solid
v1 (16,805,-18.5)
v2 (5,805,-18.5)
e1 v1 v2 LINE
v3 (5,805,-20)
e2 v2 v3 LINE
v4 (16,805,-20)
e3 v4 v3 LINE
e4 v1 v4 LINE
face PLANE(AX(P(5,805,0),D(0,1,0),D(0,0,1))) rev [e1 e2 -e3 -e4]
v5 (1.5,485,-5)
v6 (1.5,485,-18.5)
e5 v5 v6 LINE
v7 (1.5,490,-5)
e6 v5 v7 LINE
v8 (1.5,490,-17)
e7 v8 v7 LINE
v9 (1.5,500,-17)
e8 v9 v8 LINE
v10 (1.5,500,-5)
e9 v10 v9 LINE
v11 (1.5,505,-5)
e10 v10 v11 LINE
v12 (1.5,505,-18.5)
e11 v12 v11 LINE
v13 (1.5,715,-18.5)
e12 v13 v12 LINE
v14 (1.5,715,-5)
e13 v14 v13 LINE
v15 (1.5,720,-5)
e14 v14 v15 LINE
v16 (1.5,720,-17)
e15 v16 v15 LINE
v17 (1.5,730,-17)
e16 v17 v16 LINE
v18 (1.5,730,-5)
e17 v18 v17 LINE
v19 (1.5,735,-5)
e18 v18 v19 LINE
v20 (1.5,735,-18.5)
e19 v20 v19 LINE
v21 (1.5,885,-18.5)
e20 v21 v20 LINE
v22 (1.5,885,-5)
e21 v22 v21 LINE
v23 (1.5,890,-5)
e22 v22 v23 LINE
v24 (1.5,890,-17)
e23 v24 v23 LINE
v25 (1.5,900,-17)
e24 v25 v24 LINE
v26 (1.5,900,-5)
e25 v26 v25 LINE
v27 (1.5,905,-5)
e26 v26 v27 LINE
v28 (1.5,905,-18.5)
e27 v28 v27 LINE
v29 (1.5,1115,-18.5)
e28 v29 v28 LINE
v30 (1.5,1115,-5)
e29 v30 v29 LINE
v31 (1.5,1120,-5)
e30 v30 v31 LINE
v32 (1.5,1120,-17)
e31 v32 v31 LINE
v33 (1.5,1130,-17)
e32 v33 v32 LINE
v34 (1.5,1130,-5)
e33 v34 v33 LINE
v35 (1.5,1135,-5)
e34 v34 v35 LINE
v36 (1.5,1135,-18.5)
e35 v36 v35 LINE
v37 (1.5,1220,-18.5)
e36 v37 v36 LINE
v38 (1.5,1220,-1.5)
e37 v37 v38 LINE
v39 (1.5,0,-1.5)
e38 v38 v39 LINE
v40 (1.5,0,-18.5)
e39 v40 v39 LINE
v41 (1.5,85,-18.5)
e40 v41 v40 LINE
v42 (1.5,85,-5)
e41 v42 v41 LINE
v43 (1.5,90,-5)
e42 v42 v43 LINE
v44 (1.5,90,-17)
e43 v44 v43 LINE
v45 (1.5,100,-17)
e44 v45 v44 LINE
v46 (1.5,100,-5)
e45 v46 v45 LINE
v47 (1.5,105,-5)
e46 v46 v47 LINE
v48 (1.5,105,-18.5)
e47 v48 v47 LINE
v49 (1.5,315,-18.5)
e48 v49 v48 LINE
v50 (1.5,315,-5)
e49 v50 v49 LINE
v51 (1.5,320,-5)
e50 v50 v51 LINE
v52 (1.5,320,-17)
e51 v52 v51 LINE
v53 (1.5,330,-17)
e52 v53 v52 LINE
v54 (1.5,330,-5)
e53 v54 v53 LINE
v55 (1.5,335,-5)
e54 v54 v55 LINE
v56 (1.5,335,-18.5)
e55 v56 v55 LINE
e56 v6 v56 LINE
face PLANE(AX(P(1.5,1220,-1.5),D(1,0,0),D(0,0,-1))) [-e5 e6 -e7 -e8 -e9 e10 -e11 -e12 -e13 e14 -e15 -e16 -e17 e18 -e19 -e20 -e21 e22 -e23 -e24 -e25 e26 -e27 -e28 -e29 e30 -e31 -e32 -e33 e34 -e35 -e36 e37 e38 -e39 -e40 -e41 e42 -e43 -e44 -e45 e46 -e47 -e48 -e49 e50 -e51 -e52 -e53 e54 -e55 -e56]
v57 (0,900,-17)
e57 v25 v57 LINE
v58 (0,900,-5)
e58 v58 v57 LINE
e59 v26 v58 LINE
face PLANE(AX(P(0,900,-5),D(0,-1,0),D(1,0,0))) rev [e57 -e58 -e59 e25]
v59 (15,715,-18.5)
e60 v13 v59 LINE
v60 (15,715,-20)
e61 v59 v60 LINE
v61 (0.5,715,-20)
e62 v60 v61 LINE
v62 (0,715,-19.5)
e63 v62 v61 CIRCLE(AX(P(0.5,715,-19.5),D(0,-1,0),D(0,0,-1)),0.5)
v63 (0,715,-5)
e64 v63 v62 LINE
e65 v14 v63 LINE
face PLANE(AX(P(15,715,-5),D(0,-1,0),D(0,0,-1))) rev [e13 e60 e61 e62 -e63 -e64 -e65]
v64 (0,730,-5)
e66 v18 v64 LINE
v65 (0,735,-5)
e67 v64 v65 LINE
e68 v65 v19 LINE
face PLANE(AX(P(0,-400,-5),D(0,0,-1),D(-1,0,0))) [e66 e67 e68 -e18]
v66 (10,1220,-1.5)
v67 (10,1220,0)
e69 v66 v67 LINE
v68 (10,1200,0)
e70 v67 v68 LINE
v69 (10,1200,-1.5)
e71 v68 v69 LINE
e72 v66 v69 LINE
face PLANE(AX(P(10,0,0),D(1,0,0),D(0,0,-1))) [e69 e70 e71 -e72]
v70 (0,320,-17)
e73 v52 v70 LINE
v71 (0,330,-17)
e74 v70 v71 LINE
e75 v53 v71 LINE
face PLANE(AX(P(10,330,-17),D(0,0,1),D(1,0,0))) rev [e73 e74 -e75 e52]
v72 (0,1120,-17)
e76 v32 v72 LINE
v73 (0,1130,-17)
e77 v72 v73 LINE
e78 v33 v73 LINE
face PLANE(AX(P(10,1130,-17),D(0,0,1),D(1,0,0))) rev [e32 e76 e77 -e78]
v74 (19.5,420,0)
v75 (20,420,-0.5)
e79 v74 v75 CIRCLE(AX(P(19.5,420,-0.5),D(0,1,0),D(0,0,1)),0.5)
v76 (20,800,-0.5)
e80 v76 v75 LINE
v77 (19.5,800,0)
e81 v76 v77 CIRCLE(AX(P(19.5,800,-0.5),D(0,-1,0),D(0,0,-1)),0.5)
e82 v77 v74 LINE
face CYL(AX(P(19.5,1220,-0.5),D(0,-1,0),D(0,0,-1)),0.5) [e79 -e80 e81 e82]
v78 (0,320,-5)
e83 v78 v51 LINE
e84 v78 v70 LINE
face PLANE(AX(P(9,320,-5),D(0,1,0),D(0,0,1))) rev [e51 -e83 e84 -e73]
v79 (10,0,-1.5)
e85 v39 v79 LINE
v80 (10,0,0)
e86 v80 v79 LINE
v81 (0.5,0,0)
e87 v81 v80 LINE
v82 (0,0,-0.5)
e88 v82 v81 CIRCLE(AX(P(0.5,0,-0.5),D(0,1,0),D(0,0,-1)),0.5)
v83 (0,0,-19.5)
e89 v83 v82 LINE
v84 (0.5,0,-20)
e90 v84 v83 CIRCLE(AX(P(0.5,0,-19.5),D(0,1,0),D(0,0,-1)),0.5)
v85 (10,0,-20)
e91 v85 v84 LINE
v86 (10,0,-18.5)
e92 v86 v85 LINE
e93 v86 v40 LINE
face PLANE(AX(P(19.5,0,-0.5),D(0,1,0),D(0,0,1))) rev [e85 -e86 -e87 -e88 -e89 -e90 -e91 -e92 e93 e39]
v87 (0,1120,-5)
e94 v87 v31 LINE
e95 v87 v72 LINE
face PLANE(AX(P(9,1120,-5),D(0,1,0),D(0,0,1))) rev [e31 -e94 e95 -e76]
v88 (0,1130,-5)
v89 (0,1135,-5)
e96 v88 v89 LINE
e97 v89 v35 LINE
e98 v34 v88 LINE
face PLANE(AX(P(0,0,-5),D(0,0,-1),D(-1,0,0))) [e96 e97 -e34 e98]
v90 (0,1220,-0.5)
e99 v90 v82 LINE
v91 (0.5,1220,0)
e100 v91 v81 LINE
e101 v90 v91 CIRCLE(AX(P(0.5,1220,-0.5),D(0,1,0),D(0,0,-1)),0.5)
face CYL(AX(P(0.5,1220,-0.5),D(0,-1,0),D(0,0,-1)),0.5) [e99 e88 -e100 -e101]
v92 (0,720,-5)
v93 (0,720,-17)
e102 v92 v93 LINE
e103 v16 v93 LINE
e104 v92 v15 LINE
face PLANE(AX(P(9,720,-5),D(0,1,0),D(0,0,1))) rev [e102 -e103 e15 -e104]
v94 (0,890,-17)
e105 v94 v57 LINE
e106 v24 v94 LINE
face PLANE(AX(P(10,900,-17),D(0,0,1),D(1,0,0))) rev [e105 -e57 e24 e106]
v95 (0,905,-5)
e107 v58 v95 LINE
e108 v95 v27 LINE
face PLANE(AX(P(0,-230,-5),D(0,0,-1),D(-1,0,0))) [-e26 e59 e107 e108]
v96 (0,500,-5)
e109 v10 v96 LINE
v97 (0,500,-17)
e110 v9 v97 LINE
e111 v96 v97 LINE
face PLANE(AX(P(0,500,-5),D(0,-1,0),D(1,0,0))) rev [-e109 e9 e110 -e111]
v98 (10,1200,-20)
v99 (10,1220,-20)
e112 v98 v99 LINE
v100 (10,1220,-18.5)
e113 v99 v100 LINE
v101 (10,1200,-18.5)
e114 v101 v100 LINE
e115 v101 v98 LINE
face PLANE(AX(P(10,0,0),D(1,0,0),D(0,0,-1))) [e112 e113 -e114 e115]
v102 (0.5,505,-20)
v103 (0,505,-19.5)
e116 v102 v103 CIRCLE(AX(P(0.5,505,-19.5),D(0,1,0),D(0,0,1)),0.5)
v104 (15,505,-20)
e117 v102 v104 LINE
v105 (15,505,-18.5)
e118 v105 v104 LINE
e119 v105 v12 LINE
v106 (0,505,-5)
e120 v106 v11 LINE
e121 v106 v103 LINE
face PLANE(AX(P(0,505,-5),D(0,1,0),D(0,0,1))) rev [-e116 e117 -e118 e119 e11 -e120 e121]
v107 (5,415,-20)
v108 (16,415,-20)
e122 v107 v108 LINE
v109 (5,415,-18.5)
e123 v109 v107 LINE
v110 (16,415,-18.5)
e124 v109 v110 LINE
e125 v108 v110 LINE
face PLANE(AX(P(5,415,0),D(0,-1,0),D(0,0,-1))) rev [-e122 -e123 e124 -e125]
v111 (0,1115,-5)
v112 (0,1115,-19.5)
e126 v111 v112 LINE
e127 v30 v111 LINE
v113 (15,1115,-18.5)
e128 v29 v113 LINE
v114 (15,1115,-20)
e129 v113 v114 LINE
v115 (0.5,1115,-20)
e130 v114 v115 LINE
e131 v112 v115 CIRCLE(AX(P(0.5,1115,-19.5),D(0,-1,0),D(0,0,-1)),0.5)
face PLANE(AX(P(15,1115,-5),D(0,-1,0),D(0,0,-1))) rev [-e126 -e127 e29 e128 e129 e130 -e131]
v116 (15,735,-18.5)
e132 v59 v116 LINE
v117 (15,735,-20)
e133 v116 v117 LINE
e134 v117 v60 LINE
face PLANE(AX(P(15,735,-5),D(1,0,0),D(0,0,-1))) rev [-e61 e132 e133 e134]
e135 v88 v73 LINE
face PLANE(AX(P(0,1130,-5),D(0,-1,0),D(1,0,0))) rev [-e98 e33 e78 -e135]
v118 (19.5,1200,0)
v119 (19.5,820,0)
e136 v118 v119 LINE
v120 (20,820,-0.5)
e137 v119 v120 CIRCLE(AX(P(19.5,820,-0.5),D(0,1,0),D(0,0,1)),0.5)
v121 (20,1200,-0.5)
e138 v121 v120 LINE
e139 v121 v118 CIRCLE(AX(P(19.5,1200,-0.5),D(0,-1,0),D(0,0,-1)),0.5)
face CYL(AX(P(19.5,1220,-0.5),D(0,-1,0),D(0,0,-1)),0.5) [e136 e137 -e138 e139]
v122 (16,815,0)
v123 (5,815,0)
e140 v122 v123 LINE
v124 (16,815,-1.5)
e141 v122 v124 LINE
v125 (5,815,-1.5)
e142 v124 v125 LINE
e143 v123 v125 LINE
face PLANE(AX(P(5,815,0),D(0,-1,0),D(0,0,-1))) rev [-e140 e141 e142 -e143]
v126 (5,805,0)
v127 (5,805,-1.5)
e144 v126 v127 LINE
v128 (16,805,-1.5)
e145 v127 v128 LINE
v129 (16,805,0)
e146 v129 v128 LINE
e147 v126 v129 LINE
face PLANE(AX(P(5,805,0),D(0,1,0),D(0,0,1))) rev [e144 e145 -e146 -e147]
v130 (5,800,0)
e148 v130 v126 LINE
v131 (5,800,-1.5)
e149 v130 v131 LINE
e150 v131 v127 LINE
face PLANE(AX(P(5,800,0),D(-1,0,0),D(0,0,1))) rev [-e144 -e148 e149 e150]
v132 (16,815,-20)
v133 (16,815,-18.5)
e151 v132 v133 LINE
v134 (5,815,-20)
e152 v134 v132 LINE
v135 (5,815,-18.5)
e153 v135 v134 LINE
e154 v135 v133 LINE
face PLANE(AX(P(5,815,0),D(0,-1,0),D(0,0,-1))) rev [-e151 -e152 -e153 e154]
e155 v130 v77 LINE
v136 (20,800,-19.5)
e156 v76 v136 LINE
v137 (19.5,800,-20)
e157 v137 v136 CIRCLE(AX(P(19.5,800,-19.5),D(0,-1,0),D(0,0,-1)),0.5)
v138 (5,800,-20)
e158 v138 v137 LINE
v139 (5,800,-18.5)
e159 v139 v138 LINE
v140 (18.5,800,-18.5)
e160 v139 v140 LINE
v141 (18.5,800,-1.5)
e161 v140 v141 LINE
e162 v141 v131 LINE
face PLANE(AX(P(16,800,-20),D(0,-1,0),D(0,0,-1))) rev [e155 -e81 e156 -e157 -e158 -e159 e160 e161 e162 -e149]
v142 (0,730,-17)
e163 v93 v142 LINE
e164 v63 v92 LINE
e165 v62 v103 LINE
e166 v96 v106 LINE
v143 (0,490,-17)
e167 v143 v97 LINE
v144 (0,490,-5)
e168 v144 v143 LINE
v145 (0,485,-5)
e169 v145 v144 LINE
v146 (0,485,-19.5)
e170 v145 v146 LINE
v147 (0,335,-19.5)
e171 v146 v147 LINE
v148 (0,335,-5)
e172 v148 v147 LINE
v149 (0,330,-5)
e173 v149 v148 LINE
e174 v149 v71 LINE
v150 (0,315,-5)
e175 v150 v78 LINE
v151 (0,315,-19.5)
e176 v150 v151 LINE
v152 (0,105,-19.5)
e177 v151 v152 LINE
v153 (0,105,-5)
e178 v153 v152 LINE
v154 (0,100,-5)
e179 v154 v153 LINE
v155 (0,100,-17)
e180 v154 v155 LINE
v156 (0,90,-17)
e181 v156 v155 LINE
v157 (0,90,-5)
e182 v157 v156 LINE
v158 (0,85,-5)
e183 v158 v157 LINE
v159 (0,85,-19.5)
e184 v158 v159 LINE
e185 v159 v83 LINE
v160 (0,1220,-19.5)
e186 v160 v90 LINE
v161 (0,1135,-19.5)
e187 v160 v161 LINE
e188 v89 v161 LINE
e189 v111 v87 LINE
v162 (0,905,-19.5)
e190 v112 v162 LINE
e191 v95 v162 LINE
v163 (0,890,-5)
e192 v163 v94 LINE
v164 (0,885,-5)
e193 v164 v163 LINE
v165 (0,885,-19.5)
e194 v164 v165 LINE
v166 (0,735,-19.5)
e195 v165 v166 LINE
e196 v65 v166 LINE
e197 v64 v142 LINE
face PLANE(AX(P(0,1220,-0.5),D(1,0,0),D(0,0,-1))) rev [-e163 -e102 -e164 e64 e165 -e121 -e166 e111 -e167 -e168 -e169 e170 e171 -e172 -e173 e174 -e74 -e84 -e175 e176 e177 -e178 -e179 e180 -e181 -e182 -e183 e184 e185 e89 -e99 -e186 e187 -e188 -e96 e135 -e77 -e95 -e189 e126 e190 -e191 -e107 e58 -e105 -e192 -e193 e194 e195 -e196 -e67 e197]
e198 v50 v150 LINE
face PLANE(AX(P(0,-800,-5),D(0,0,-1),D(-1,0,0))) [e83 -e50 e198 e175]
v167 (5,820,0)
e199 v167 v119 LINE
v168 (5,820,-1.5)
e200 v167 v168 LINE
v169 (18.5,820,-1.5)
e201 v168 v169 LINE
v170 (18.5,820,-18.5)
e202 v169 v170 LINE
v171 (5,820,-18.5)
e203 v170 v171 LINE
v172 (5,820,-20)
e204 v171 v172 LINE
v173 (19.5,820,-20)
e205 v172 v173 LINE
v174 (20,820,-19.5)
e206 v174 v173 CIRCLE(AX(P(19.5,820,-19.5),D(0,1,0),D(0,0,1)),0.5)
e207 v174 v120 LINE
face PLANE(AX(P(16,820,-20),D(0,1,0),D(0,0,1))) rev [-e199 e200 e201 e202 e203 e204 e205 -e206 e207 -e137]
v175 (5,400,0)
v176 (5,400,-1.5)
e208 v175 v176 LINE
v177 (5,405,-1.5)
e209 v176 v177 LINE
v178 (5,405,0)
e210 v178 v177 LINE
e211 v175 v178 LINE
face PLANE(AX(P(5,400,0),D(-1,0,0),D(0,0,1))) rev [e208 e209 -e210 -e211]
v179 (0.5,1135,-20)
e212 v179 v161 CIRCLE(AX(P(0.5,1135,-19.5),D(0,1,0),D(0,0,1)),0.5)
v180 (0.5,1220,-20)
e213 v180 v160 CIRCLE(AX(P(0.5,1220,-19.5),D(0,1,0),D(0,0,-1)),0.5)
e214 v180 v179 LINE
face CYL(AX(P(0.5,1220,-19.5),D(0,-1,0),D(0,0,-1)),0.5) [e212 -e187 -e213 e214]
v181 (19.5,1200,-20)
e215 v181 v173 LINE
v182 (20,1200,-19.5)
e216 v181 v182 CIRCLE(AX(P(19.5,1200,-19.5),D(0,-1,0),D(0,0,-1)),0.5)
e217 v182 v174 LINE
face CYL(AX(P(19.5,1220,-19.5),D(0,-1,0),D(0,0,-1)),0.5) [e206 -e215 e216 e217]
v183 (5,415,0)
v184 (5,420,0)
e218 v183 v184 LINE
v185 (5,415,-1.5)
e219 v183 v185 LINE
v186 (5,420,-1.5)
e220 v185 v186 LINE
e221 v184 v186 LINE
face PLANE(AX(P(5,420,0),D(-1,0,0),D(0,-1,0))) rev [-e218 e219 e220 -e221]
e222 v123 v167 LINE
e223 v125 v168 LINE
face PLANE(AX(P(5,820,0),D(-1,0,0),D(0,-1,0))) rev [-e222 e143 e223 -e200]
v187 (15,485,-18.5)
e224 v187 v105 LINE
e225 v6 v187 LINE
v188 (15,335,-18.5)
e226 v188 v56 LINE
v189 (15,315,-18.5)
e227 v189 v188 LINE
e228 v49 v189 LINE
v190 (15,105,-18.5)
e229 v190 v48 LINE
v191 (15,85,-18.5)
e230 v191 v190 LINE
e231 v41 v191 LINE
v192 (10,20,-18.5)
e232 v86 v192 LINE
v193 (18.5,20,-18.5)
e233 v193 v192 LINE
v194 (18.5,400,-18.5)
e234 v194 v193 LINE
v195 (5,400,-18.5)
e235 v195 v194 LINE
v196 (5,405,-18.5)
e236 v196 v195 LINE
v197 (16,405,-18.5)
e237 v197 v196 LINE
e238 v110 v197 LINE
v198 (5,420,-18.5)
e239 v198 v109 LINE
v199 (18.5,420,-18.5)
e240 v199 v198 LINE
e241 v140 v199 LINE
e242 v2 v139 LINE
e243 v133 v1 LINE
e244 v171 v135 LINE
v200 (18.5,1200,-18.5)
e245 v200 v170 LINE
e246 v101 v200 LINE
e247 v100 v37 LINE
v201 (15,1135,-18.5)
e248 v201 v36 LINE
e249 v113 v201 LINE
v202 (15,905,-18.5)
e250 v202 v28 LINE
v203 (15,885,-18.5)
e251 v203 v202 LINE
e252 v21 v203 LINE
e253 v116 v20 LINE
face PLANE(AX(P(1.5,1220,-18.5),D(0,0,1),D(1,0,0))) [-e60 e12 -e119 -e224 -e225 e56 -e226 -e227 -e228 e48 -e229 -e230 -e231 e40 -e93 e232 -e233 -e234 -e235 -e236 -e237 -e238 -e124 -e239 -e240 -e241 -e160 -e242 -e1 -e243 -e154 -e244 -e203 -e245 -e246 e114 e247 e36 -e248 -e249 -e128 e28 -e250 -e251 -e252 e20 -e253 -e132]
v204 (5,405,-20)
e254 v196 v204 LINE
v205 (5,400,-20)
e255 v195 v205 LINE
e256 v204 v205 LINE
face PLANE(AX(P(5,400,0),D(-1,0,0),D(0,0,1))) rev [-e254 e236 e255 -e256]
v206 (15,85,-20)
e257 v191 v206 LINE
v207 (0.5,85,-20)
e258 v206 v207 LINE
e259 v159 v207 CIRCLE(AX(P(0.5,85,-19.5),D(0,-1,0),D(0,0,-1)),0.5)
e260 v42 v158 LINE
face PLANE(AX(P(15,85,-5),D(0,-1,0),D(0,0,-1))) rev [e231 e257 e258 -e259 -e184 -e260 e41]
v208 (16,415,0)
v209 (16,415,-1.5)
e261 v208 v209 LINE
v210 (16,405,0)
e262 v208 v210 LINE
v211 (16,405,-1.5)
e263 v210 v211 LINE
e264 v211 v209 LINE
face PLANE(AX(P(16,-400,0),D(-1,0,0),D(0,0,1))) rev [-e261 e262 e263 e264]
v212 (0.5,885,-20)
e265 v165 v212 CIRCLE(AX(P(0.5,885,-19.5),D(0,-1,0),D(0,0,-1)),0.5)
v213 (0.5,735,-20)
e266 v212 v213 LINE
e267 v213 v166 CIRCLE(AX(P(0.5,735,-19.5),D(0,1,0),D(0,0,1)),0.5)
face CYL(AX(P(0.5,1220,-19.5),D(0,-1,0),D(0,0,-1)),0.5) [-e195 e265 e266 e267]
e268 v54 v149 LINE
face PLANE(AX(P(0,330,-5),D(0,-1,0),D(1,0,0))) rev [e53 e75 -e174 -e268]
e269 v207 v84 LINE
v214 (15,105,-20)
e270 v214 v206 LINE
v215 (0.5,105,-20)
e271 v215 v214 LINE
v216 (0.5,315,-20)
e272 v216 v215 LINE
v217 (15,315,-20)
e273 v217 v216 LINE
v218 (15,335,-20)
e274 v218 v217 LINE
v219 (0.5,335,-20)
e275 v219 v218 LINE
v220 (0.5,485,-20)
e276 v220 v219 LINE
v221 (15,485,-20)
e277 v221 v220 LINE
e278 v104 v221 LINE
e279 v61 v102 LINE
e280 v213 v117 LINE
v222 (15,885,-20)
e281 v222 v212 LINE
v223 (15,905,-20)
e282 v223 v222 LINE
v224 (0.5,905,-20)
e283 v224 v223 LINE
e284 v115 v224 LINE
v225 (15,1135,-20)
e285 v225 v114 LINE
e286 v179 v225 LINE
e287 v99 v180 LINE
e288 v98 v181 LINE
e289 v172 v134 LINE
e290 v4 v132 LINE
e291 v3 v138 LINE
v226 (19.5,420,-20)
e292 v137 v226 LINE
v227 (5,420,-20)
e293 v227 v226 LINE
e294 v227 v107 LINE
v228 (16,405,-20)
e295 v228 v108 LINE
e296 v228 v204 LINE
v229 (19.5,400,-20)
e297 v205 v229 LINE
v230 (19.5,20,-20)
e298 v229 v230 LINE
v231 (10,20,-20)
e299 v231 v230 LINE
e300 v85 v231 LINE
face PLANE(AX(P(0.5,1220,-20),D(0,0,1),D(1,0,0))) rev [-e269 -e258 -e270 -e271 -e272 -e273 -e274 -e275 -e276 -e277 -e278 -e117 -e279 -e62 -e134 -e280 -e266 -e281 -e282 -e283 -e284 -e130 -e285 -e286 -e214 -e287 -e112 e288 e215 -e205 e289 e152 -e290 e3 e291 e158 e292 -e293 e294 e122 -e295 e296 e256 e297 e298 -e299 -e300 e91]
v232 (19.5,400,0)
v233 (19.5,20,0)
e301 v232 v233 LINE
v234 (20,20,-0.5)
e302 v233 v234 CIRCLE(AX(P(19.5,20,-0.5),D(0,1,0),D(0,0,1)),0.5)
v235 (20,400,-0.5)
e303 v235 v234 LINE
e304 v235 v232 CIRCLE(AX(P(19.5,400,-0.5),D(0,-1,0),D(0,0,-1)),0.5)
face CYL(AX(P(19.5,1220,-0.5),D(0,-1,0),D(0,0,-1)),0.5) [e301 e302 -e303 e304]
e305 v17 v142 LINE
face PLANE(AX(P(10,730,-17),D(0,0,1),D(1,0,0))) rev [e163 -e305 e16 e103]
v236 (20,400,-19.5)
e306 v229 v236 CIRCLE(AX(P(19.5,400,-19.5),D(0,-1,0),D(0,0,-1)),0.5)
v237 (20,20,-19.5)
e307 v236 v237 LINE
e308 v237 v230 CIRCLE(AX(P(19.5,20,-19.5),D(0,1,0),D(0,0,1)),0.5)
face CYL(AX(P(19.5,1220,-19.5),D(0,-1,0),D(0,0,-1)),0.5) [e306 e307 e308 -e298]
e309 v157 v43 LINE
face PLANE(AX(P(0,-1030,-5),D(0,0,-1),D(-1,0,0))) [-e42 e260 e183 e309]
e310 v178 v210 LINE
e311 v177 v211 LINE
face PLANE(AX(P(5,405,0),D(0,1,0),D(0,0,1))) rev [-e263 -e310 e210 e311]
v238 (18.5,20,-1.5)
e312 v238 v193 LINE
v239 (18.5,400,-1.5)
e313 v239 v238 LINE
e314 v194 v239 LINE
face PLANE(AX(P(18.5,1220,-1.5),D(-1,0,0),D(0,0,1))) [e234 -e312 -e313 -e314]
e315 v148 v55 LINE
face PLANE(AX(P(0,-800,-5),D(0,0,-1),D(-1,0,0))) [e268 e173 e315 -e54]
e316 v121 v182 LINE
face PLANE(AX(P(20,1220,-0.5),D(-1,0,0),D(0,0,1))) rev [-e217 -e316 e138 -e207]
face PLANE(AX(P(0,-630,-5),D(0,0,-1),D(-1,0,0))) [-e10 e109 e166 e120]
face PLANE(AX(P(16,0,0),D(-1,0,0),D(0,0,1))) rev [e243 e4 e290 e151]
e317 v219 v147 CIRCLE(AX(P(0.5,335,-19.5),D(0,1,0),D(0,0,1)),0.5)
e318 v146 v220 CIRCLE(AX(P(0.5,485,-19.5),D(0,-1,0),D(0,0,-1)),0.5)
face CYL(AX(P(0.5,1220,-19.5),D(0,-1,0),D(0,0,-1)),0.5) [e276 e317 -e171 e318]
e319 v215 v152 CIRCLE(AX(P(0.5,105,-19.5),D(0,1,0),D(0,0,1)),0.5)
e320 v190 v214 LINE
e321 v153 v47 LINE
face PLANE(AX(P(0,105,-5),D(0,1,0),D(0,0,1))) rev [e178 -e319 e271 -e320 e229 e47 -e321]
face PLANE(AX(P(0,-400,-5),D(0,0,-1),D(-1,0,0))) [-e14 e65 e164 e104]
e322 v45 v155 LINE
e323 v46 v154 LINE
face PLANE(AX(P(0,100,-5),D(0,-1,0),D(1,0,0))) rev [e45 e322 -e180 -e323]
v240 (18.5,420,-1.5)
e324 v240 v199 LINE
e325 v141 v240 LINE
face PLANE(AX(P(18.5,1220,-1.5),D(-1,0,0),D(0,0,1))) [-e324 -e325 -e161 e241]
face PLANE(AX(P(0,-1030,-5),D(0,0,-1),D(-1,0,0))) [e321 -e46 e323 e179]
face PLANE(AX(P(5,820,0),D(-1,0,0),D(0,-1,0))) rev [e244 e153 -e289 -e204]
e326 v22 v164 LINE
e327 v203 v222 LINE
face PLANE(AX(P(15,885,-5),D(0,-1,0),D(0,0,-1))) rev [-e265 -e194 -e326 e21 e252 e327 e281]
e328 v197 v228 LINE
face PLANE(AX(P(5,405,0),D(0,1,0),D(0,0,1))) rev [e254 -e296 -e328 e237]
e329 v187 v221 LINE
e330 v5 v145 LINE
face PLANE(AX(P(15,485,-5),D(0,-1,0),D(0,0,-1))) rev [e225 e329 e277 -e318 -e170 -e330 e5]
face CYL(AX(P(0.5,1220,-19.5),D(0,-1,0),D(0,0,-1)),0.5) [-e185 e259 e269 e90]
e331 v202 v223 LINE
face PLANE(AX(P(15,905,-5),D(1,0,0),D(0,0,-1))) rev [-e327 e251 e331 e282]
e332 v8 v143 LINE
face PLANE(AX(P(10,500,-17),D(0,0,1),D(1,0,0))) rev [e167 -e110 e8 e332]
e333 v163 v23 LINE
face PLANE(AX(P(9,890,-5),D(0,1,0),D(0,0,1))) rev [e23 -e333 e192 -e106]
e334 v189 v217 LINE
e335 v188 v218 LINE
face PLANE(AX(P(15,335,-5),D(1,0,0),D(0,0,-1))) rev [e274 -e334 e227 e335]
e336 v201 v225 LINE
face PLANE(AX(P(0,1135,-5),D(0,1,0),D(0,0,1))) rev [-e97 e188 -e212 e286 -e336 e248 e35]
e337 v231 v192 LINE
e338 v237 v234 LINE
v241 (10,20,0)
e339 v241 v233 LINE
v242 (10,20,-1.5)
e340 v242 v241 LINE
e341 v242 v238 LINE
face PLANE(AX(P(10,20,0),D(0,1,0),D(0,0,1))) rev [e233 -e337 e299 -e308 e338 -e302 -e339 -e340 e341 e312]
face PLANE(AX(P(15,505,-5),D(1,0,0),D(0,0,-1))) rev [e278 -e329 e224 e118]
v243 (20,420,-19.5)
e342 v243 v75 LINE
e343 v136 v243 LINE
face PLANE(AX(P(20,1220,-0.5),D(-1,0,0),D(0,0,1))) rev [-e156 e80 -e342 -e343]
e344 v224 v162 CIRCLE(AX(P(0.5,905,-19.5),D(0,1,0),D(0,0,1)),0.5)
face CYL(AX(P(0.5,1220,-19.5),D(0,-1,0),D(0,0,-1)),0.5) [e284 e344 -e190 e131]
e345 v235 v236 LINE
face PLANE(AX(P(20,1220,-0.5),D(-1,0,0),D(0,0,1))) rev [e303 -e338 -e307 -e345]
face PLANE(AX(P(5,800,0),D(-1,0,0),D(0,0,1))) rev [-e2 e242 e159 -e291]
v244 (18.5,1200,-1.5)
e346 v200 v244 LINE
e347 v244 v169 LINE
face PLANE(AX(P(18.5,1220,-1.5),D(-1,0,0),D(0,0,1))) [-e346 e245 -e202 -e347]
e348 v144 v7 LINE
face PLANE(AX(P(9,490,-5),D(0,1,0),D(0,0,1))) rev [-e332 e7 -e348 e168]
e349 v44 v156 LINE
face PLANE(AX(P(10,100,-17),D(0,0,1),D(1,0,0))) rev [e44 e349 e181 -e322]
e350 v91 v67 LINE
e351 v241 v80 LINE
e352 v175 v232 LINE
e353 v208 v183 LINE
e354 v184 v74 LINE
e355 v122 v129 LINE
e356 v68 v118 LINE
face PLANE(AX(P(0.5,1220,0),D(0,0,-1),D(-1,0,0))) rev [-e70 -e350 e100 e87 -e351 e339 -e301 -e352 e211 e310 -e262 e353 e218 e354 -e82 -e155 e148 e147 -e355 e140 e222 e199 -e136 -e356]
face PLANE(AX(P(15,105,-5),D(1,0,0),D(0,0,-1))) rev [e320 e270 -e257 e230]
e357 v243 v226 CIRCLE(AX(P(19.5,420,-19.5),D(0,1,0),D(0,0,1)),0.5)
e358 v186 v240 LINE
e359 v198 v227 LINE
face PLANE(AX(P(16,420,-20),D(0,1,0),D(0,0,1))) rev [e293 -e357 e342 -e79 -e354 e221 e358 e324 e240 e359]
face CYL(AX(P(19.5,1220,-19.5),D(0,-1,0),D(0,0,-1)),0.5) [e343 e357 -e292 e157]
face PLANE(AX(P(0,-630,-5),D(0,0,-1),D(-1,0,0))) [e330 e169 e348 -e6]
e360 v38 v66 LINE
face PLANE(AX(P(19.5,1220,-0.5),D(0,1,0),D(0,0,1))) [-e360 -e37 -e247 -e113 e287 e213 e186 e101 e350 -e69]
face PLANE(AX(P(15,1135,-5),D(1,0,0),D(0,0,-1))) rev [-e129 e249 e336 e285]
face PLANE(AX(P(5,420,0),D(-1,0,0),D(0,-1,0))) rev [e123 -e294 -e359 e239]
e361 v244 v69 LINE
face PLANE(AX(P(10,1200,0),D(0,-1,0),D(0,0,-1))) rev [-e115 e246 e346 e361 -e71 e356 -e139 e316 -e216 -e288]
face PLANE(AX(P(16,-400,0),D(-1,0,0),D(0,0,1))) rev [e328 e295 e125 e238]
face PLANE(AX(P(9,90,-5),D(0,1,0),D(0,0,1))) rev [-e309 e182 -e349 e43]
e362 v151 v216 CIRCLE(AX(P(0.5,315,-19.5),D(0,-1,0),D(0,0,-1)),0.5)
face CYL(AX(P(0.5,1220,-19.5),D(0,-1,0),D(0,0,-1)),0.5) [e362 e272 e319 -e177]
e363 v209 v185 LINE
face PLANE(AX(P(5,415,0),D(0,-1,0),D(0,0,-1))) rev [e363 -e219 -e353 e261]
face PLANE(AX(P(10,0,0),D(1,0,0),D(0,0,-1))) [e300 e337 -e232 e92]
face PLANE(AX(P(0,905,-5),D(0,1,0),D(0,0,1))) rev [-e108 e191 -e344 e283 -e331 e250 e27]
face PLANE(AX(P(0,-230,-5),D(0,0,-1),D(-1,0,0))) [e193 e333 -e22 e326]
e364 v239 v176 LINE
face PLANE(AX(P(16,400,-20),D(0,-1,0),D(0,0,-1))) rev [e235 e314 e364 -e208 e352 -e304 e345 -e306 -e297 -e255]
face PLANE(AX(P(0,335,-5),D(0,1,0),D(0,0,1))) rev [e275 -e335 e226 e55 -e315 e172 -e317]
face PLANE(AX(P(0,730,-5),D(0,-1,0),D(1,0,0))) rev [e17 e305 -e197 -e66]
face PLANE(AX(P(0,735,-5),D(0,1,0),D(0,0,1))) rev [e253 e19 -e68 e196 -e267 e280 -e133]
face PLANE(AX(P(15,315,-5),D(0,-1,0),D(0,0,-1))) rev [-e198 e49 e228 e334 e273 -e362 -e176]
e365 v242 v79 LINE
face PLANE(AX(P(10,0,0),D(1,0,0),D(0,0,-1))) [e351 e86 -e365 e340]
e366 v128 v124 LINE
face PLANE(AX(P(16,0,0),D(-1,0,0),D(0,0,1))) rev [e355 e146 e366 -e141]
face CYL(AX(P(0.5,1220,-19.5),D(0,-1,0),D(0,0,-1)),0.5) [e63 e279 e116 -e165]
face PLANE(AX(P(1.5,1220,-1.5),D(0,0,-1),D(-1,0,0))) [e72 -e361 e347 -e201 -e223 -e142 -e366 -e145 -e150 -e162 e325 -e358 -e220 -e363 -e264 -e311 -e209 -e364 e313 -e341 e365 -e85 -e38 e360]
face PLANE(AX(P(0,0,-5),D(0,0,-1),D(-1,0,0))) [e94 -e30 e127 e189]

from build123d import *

# Parameters (mm, degrees)
SKETCH1_W                   = 17
SKETCH1_H                   = 17
BOSS_EXTRUDE1_DEPTH         = 1220
SKETCH2_W                   = 20
SKETCH2_H                   = 20
CUT_EXTRUDE1_DEPTH          = 10
CUT_EXTRUDE2_DEPTH          = 15
SKETCH4_W                   = 3
SKETCH4_H                   = 10
CUT_EXTRUDE3_DEPTH          = 10
SKETCH_PATTERN1_START       = -20
SKETCH_PATTERN1_DEPTH       = 15
SKETCH_PATTERN1_2_OUTLINE_W = 1.5
SKETCH_PATTERN1_2_OUTLINE_H = 10
SKETCH_PATTERN1_2_DEPTH     = 3
SKETCH6_W                   = 20
SKETCH6_H                   = 20
CUT_EXTRUDE4_DEPTH          = 4
SKETCH7_W                   = 11
SKETCH7_H                   = 5
CUT_EXTRUDE5_DEPTH          = 1221.327824808
LPATTERN1_COUNT             = 2
LPATTERN1_PITCH             = 400


# Read off the part's stored shape, not the designer's step: Sketch-Pattern1
with BuildPart() as part:
    # Sketch1 → Boss-Extrude1 (new body)
    with BuildSketch(Plane(origin=(0, 0, 0), x_dir=(1, 0, 0), z_dir=(0, 1, 0))):
        with BuildLine():
            Line((0.5, 0), (19.5, 0))
            ThreePointArc((19.5, 0), (19.853553391, 0.146446609), (20, 0.5))
            Line((20, 0.5), (20, 19.5))
            ThreePointArc((20, 19.5), (19.853553391, 19.853553391), (19.5, 20))
            Line((19.5, 20), (0.5, 20))
            ThreePointArc((0.5, 20), (0.146446609, 19.853553391), (0, 19.5))
            Line((0, 19.5), (0, 0.5))
            ThreePointArc((0, 0.5), (0.146446609, 0.146446609), (0.5, 0))
        make_face()
        with Locations((10, 10)):
            Rectangle(SKETCH1_W, SKETCH1_H, mode=Mode.SUBTRACT)
    extrude(amount=BOSS_EXTRUDE1_DEPTH)

    # Sketch2 → Cut-Extrude1 (cut)
    with BuildSketch(Plane(origin=(20, 0, 0), x_dir=(0, 0, -1), z_dir=(1, 0, 0))):
        with Locations((10, 1210)):
            Rectangle(SKETCH2_W, SKETCH2_H)
        with Locations((10, 10)):
            Rectangle(SKETCH2_W, SKETCH2_H)
    extrude(amount=-CUT_EXTRUDE1_DEPTH, mode=Mode.SUBTRACT)

    # Sketch3 → Cut-Extrude2 (cut)
    with BuildSketch(Plane(origin=(0, 0, -20), x_dir=(-1, 0, 0), z_dir=(0, 0, -1))):
        Polygon((-15, 1115), (0, 1115), (0, 1120), (-9, 1120), (-9, 1130), (0, 1130), (0, 1135), (-15, 1135), align=None)
    extrude(amount=-CUT_EXTRUDE2_DEPTH, mode=Mode.SUBTRACT)

    # Sketch4 → Cut-Extrude3 (cut)
    with BuildSketch(Plane.ZY):
        with Locations((-18.5, 1125)):
            Rectangle(SKETCH4_W, SKETCH4_H)
    extrude(amount=-CUT_EXTRUDE3_DEPTH, mode=Mode.SUBTRACT)

    # Sketch-Pattern1 outline → Sketch-Pattern1 (cut)
    with BuildSketch(Plane.XY.offset(SKETCH_PATTERN1_START)):
        Polygon((15, 85), (15, 105), (0, 105), (0, 100), (1.5, 100), (1.5, 90), (0, 90), (0, 85), align=None)
        Polygon((1.5, 330), (1.5, 320), (0, 320), (0, 315), (15, 315), (15, 335), (0, 335), (0, 330), align=None)
        Polygon((1.5, 500), (1.5, 490), (0, 490), (0, 485), (15, 485), (15, 505), (0, 505), (0, 500), align=None)
        Polygon((1.5, 730), (1.5, 720), (0, 720), (0, 715), (15, 715), (15, 735), (0, 735), (0, 730), align=None)
        Polygon((1.5, 900), (1.5, 890), (0, 890), (0, 885), (15, 885), (15, 905), (0, 905), (0, 900), align=None)
    extrude(amount=SKETCH_PATTERN1_DEPTH, mode=Mode.SUBTRACT)

    # Sketch-Pattern1 2 outline → Sketch-Pattern1 2 (cut)
    with BuildSketch(Plane.XY.offset(SKETCH_PATTERN1_START)):
        with Locations((0.75, 95)):
            Rectangle(SKETCH_PATTERN1_2_OUTLINE_W, SKETCH_PATTERN1_2_OUTLINE_H)
        with Locations((0.75, 325)):
            Rectangle(SKETCH_PATTERN1_2_OUTLINE_W, SKETCH_PATTERN1_2_OUTLINE_H)
        with Locations((0.75, 495)):
            Rectangle(SKETCH_PATTERN1_2_OUTLINE_W, SKETCH_PATTERN1_2_OUTLINE_H)
        with Locations((0.75, 725)):
            Rectangle(SKETCH_PATTERN1_2_OUTLINE_W, SKETCH_PATTERN1_2_OUTLINE_H)
        with Locations((0.75, 895)):
            Rectangle(SKETCH_PATTERN1_2_OUTLINE_W, SKETCH_PATTERN1_2_OUTLINE_H)
    extrude(amount=SKETCH_PATTERN1_2_DEPTH, mode=Mode.SUBTRACT)

    # Sketch6 → Cut-Extrude4 (cut)
    with BuildSketch(Plane(origin=(20, 0, 0), x_dir=(0, 0, -1), z_dir=(1, 0, 0))):
        with Locations((10, 810)):
            Rectangle(SKETCH6_W, SKETCH6_H)
    cut_extrude4 = extrude(amount=-CUT_EXTRUDE4_DEPTH, mode=Mode.SUBTRACT)

    # Sketch7 → Cut-Extrude5 (cut, symmetric)
    with BuildSketch(Plane(origin=(0, 0, -20), x_dir=(-1, 0, 0), z_dir=(0, 0, -1))):
        with Locations((-10.5, 817.5)):
            Rectangle(SKETCH7_W, SKETCH7_H)
        with Locations((-10.5, 802.5)):
            Rectangle(SKETCH7_W, SKETCH7_H)
    cut_extrude5 = extrude(amount=CUT_EXTRUDE5_DEPTH, both=True, mode=Mode.SUBTRACT)

    # LPattern1: Cut-Extrude4, Cut-Extrude5 ×2
    with Locations(*[(0, -i * LPATTERN1_PITCH, 0) for i in range(1, LPATTERN1_COUNT)]):
        add(cut_extrude4, mode=Mode.SUBTRACT)
        add(cut_extrude5, mode=Mode.SUBTRACT)


solid = part.part
